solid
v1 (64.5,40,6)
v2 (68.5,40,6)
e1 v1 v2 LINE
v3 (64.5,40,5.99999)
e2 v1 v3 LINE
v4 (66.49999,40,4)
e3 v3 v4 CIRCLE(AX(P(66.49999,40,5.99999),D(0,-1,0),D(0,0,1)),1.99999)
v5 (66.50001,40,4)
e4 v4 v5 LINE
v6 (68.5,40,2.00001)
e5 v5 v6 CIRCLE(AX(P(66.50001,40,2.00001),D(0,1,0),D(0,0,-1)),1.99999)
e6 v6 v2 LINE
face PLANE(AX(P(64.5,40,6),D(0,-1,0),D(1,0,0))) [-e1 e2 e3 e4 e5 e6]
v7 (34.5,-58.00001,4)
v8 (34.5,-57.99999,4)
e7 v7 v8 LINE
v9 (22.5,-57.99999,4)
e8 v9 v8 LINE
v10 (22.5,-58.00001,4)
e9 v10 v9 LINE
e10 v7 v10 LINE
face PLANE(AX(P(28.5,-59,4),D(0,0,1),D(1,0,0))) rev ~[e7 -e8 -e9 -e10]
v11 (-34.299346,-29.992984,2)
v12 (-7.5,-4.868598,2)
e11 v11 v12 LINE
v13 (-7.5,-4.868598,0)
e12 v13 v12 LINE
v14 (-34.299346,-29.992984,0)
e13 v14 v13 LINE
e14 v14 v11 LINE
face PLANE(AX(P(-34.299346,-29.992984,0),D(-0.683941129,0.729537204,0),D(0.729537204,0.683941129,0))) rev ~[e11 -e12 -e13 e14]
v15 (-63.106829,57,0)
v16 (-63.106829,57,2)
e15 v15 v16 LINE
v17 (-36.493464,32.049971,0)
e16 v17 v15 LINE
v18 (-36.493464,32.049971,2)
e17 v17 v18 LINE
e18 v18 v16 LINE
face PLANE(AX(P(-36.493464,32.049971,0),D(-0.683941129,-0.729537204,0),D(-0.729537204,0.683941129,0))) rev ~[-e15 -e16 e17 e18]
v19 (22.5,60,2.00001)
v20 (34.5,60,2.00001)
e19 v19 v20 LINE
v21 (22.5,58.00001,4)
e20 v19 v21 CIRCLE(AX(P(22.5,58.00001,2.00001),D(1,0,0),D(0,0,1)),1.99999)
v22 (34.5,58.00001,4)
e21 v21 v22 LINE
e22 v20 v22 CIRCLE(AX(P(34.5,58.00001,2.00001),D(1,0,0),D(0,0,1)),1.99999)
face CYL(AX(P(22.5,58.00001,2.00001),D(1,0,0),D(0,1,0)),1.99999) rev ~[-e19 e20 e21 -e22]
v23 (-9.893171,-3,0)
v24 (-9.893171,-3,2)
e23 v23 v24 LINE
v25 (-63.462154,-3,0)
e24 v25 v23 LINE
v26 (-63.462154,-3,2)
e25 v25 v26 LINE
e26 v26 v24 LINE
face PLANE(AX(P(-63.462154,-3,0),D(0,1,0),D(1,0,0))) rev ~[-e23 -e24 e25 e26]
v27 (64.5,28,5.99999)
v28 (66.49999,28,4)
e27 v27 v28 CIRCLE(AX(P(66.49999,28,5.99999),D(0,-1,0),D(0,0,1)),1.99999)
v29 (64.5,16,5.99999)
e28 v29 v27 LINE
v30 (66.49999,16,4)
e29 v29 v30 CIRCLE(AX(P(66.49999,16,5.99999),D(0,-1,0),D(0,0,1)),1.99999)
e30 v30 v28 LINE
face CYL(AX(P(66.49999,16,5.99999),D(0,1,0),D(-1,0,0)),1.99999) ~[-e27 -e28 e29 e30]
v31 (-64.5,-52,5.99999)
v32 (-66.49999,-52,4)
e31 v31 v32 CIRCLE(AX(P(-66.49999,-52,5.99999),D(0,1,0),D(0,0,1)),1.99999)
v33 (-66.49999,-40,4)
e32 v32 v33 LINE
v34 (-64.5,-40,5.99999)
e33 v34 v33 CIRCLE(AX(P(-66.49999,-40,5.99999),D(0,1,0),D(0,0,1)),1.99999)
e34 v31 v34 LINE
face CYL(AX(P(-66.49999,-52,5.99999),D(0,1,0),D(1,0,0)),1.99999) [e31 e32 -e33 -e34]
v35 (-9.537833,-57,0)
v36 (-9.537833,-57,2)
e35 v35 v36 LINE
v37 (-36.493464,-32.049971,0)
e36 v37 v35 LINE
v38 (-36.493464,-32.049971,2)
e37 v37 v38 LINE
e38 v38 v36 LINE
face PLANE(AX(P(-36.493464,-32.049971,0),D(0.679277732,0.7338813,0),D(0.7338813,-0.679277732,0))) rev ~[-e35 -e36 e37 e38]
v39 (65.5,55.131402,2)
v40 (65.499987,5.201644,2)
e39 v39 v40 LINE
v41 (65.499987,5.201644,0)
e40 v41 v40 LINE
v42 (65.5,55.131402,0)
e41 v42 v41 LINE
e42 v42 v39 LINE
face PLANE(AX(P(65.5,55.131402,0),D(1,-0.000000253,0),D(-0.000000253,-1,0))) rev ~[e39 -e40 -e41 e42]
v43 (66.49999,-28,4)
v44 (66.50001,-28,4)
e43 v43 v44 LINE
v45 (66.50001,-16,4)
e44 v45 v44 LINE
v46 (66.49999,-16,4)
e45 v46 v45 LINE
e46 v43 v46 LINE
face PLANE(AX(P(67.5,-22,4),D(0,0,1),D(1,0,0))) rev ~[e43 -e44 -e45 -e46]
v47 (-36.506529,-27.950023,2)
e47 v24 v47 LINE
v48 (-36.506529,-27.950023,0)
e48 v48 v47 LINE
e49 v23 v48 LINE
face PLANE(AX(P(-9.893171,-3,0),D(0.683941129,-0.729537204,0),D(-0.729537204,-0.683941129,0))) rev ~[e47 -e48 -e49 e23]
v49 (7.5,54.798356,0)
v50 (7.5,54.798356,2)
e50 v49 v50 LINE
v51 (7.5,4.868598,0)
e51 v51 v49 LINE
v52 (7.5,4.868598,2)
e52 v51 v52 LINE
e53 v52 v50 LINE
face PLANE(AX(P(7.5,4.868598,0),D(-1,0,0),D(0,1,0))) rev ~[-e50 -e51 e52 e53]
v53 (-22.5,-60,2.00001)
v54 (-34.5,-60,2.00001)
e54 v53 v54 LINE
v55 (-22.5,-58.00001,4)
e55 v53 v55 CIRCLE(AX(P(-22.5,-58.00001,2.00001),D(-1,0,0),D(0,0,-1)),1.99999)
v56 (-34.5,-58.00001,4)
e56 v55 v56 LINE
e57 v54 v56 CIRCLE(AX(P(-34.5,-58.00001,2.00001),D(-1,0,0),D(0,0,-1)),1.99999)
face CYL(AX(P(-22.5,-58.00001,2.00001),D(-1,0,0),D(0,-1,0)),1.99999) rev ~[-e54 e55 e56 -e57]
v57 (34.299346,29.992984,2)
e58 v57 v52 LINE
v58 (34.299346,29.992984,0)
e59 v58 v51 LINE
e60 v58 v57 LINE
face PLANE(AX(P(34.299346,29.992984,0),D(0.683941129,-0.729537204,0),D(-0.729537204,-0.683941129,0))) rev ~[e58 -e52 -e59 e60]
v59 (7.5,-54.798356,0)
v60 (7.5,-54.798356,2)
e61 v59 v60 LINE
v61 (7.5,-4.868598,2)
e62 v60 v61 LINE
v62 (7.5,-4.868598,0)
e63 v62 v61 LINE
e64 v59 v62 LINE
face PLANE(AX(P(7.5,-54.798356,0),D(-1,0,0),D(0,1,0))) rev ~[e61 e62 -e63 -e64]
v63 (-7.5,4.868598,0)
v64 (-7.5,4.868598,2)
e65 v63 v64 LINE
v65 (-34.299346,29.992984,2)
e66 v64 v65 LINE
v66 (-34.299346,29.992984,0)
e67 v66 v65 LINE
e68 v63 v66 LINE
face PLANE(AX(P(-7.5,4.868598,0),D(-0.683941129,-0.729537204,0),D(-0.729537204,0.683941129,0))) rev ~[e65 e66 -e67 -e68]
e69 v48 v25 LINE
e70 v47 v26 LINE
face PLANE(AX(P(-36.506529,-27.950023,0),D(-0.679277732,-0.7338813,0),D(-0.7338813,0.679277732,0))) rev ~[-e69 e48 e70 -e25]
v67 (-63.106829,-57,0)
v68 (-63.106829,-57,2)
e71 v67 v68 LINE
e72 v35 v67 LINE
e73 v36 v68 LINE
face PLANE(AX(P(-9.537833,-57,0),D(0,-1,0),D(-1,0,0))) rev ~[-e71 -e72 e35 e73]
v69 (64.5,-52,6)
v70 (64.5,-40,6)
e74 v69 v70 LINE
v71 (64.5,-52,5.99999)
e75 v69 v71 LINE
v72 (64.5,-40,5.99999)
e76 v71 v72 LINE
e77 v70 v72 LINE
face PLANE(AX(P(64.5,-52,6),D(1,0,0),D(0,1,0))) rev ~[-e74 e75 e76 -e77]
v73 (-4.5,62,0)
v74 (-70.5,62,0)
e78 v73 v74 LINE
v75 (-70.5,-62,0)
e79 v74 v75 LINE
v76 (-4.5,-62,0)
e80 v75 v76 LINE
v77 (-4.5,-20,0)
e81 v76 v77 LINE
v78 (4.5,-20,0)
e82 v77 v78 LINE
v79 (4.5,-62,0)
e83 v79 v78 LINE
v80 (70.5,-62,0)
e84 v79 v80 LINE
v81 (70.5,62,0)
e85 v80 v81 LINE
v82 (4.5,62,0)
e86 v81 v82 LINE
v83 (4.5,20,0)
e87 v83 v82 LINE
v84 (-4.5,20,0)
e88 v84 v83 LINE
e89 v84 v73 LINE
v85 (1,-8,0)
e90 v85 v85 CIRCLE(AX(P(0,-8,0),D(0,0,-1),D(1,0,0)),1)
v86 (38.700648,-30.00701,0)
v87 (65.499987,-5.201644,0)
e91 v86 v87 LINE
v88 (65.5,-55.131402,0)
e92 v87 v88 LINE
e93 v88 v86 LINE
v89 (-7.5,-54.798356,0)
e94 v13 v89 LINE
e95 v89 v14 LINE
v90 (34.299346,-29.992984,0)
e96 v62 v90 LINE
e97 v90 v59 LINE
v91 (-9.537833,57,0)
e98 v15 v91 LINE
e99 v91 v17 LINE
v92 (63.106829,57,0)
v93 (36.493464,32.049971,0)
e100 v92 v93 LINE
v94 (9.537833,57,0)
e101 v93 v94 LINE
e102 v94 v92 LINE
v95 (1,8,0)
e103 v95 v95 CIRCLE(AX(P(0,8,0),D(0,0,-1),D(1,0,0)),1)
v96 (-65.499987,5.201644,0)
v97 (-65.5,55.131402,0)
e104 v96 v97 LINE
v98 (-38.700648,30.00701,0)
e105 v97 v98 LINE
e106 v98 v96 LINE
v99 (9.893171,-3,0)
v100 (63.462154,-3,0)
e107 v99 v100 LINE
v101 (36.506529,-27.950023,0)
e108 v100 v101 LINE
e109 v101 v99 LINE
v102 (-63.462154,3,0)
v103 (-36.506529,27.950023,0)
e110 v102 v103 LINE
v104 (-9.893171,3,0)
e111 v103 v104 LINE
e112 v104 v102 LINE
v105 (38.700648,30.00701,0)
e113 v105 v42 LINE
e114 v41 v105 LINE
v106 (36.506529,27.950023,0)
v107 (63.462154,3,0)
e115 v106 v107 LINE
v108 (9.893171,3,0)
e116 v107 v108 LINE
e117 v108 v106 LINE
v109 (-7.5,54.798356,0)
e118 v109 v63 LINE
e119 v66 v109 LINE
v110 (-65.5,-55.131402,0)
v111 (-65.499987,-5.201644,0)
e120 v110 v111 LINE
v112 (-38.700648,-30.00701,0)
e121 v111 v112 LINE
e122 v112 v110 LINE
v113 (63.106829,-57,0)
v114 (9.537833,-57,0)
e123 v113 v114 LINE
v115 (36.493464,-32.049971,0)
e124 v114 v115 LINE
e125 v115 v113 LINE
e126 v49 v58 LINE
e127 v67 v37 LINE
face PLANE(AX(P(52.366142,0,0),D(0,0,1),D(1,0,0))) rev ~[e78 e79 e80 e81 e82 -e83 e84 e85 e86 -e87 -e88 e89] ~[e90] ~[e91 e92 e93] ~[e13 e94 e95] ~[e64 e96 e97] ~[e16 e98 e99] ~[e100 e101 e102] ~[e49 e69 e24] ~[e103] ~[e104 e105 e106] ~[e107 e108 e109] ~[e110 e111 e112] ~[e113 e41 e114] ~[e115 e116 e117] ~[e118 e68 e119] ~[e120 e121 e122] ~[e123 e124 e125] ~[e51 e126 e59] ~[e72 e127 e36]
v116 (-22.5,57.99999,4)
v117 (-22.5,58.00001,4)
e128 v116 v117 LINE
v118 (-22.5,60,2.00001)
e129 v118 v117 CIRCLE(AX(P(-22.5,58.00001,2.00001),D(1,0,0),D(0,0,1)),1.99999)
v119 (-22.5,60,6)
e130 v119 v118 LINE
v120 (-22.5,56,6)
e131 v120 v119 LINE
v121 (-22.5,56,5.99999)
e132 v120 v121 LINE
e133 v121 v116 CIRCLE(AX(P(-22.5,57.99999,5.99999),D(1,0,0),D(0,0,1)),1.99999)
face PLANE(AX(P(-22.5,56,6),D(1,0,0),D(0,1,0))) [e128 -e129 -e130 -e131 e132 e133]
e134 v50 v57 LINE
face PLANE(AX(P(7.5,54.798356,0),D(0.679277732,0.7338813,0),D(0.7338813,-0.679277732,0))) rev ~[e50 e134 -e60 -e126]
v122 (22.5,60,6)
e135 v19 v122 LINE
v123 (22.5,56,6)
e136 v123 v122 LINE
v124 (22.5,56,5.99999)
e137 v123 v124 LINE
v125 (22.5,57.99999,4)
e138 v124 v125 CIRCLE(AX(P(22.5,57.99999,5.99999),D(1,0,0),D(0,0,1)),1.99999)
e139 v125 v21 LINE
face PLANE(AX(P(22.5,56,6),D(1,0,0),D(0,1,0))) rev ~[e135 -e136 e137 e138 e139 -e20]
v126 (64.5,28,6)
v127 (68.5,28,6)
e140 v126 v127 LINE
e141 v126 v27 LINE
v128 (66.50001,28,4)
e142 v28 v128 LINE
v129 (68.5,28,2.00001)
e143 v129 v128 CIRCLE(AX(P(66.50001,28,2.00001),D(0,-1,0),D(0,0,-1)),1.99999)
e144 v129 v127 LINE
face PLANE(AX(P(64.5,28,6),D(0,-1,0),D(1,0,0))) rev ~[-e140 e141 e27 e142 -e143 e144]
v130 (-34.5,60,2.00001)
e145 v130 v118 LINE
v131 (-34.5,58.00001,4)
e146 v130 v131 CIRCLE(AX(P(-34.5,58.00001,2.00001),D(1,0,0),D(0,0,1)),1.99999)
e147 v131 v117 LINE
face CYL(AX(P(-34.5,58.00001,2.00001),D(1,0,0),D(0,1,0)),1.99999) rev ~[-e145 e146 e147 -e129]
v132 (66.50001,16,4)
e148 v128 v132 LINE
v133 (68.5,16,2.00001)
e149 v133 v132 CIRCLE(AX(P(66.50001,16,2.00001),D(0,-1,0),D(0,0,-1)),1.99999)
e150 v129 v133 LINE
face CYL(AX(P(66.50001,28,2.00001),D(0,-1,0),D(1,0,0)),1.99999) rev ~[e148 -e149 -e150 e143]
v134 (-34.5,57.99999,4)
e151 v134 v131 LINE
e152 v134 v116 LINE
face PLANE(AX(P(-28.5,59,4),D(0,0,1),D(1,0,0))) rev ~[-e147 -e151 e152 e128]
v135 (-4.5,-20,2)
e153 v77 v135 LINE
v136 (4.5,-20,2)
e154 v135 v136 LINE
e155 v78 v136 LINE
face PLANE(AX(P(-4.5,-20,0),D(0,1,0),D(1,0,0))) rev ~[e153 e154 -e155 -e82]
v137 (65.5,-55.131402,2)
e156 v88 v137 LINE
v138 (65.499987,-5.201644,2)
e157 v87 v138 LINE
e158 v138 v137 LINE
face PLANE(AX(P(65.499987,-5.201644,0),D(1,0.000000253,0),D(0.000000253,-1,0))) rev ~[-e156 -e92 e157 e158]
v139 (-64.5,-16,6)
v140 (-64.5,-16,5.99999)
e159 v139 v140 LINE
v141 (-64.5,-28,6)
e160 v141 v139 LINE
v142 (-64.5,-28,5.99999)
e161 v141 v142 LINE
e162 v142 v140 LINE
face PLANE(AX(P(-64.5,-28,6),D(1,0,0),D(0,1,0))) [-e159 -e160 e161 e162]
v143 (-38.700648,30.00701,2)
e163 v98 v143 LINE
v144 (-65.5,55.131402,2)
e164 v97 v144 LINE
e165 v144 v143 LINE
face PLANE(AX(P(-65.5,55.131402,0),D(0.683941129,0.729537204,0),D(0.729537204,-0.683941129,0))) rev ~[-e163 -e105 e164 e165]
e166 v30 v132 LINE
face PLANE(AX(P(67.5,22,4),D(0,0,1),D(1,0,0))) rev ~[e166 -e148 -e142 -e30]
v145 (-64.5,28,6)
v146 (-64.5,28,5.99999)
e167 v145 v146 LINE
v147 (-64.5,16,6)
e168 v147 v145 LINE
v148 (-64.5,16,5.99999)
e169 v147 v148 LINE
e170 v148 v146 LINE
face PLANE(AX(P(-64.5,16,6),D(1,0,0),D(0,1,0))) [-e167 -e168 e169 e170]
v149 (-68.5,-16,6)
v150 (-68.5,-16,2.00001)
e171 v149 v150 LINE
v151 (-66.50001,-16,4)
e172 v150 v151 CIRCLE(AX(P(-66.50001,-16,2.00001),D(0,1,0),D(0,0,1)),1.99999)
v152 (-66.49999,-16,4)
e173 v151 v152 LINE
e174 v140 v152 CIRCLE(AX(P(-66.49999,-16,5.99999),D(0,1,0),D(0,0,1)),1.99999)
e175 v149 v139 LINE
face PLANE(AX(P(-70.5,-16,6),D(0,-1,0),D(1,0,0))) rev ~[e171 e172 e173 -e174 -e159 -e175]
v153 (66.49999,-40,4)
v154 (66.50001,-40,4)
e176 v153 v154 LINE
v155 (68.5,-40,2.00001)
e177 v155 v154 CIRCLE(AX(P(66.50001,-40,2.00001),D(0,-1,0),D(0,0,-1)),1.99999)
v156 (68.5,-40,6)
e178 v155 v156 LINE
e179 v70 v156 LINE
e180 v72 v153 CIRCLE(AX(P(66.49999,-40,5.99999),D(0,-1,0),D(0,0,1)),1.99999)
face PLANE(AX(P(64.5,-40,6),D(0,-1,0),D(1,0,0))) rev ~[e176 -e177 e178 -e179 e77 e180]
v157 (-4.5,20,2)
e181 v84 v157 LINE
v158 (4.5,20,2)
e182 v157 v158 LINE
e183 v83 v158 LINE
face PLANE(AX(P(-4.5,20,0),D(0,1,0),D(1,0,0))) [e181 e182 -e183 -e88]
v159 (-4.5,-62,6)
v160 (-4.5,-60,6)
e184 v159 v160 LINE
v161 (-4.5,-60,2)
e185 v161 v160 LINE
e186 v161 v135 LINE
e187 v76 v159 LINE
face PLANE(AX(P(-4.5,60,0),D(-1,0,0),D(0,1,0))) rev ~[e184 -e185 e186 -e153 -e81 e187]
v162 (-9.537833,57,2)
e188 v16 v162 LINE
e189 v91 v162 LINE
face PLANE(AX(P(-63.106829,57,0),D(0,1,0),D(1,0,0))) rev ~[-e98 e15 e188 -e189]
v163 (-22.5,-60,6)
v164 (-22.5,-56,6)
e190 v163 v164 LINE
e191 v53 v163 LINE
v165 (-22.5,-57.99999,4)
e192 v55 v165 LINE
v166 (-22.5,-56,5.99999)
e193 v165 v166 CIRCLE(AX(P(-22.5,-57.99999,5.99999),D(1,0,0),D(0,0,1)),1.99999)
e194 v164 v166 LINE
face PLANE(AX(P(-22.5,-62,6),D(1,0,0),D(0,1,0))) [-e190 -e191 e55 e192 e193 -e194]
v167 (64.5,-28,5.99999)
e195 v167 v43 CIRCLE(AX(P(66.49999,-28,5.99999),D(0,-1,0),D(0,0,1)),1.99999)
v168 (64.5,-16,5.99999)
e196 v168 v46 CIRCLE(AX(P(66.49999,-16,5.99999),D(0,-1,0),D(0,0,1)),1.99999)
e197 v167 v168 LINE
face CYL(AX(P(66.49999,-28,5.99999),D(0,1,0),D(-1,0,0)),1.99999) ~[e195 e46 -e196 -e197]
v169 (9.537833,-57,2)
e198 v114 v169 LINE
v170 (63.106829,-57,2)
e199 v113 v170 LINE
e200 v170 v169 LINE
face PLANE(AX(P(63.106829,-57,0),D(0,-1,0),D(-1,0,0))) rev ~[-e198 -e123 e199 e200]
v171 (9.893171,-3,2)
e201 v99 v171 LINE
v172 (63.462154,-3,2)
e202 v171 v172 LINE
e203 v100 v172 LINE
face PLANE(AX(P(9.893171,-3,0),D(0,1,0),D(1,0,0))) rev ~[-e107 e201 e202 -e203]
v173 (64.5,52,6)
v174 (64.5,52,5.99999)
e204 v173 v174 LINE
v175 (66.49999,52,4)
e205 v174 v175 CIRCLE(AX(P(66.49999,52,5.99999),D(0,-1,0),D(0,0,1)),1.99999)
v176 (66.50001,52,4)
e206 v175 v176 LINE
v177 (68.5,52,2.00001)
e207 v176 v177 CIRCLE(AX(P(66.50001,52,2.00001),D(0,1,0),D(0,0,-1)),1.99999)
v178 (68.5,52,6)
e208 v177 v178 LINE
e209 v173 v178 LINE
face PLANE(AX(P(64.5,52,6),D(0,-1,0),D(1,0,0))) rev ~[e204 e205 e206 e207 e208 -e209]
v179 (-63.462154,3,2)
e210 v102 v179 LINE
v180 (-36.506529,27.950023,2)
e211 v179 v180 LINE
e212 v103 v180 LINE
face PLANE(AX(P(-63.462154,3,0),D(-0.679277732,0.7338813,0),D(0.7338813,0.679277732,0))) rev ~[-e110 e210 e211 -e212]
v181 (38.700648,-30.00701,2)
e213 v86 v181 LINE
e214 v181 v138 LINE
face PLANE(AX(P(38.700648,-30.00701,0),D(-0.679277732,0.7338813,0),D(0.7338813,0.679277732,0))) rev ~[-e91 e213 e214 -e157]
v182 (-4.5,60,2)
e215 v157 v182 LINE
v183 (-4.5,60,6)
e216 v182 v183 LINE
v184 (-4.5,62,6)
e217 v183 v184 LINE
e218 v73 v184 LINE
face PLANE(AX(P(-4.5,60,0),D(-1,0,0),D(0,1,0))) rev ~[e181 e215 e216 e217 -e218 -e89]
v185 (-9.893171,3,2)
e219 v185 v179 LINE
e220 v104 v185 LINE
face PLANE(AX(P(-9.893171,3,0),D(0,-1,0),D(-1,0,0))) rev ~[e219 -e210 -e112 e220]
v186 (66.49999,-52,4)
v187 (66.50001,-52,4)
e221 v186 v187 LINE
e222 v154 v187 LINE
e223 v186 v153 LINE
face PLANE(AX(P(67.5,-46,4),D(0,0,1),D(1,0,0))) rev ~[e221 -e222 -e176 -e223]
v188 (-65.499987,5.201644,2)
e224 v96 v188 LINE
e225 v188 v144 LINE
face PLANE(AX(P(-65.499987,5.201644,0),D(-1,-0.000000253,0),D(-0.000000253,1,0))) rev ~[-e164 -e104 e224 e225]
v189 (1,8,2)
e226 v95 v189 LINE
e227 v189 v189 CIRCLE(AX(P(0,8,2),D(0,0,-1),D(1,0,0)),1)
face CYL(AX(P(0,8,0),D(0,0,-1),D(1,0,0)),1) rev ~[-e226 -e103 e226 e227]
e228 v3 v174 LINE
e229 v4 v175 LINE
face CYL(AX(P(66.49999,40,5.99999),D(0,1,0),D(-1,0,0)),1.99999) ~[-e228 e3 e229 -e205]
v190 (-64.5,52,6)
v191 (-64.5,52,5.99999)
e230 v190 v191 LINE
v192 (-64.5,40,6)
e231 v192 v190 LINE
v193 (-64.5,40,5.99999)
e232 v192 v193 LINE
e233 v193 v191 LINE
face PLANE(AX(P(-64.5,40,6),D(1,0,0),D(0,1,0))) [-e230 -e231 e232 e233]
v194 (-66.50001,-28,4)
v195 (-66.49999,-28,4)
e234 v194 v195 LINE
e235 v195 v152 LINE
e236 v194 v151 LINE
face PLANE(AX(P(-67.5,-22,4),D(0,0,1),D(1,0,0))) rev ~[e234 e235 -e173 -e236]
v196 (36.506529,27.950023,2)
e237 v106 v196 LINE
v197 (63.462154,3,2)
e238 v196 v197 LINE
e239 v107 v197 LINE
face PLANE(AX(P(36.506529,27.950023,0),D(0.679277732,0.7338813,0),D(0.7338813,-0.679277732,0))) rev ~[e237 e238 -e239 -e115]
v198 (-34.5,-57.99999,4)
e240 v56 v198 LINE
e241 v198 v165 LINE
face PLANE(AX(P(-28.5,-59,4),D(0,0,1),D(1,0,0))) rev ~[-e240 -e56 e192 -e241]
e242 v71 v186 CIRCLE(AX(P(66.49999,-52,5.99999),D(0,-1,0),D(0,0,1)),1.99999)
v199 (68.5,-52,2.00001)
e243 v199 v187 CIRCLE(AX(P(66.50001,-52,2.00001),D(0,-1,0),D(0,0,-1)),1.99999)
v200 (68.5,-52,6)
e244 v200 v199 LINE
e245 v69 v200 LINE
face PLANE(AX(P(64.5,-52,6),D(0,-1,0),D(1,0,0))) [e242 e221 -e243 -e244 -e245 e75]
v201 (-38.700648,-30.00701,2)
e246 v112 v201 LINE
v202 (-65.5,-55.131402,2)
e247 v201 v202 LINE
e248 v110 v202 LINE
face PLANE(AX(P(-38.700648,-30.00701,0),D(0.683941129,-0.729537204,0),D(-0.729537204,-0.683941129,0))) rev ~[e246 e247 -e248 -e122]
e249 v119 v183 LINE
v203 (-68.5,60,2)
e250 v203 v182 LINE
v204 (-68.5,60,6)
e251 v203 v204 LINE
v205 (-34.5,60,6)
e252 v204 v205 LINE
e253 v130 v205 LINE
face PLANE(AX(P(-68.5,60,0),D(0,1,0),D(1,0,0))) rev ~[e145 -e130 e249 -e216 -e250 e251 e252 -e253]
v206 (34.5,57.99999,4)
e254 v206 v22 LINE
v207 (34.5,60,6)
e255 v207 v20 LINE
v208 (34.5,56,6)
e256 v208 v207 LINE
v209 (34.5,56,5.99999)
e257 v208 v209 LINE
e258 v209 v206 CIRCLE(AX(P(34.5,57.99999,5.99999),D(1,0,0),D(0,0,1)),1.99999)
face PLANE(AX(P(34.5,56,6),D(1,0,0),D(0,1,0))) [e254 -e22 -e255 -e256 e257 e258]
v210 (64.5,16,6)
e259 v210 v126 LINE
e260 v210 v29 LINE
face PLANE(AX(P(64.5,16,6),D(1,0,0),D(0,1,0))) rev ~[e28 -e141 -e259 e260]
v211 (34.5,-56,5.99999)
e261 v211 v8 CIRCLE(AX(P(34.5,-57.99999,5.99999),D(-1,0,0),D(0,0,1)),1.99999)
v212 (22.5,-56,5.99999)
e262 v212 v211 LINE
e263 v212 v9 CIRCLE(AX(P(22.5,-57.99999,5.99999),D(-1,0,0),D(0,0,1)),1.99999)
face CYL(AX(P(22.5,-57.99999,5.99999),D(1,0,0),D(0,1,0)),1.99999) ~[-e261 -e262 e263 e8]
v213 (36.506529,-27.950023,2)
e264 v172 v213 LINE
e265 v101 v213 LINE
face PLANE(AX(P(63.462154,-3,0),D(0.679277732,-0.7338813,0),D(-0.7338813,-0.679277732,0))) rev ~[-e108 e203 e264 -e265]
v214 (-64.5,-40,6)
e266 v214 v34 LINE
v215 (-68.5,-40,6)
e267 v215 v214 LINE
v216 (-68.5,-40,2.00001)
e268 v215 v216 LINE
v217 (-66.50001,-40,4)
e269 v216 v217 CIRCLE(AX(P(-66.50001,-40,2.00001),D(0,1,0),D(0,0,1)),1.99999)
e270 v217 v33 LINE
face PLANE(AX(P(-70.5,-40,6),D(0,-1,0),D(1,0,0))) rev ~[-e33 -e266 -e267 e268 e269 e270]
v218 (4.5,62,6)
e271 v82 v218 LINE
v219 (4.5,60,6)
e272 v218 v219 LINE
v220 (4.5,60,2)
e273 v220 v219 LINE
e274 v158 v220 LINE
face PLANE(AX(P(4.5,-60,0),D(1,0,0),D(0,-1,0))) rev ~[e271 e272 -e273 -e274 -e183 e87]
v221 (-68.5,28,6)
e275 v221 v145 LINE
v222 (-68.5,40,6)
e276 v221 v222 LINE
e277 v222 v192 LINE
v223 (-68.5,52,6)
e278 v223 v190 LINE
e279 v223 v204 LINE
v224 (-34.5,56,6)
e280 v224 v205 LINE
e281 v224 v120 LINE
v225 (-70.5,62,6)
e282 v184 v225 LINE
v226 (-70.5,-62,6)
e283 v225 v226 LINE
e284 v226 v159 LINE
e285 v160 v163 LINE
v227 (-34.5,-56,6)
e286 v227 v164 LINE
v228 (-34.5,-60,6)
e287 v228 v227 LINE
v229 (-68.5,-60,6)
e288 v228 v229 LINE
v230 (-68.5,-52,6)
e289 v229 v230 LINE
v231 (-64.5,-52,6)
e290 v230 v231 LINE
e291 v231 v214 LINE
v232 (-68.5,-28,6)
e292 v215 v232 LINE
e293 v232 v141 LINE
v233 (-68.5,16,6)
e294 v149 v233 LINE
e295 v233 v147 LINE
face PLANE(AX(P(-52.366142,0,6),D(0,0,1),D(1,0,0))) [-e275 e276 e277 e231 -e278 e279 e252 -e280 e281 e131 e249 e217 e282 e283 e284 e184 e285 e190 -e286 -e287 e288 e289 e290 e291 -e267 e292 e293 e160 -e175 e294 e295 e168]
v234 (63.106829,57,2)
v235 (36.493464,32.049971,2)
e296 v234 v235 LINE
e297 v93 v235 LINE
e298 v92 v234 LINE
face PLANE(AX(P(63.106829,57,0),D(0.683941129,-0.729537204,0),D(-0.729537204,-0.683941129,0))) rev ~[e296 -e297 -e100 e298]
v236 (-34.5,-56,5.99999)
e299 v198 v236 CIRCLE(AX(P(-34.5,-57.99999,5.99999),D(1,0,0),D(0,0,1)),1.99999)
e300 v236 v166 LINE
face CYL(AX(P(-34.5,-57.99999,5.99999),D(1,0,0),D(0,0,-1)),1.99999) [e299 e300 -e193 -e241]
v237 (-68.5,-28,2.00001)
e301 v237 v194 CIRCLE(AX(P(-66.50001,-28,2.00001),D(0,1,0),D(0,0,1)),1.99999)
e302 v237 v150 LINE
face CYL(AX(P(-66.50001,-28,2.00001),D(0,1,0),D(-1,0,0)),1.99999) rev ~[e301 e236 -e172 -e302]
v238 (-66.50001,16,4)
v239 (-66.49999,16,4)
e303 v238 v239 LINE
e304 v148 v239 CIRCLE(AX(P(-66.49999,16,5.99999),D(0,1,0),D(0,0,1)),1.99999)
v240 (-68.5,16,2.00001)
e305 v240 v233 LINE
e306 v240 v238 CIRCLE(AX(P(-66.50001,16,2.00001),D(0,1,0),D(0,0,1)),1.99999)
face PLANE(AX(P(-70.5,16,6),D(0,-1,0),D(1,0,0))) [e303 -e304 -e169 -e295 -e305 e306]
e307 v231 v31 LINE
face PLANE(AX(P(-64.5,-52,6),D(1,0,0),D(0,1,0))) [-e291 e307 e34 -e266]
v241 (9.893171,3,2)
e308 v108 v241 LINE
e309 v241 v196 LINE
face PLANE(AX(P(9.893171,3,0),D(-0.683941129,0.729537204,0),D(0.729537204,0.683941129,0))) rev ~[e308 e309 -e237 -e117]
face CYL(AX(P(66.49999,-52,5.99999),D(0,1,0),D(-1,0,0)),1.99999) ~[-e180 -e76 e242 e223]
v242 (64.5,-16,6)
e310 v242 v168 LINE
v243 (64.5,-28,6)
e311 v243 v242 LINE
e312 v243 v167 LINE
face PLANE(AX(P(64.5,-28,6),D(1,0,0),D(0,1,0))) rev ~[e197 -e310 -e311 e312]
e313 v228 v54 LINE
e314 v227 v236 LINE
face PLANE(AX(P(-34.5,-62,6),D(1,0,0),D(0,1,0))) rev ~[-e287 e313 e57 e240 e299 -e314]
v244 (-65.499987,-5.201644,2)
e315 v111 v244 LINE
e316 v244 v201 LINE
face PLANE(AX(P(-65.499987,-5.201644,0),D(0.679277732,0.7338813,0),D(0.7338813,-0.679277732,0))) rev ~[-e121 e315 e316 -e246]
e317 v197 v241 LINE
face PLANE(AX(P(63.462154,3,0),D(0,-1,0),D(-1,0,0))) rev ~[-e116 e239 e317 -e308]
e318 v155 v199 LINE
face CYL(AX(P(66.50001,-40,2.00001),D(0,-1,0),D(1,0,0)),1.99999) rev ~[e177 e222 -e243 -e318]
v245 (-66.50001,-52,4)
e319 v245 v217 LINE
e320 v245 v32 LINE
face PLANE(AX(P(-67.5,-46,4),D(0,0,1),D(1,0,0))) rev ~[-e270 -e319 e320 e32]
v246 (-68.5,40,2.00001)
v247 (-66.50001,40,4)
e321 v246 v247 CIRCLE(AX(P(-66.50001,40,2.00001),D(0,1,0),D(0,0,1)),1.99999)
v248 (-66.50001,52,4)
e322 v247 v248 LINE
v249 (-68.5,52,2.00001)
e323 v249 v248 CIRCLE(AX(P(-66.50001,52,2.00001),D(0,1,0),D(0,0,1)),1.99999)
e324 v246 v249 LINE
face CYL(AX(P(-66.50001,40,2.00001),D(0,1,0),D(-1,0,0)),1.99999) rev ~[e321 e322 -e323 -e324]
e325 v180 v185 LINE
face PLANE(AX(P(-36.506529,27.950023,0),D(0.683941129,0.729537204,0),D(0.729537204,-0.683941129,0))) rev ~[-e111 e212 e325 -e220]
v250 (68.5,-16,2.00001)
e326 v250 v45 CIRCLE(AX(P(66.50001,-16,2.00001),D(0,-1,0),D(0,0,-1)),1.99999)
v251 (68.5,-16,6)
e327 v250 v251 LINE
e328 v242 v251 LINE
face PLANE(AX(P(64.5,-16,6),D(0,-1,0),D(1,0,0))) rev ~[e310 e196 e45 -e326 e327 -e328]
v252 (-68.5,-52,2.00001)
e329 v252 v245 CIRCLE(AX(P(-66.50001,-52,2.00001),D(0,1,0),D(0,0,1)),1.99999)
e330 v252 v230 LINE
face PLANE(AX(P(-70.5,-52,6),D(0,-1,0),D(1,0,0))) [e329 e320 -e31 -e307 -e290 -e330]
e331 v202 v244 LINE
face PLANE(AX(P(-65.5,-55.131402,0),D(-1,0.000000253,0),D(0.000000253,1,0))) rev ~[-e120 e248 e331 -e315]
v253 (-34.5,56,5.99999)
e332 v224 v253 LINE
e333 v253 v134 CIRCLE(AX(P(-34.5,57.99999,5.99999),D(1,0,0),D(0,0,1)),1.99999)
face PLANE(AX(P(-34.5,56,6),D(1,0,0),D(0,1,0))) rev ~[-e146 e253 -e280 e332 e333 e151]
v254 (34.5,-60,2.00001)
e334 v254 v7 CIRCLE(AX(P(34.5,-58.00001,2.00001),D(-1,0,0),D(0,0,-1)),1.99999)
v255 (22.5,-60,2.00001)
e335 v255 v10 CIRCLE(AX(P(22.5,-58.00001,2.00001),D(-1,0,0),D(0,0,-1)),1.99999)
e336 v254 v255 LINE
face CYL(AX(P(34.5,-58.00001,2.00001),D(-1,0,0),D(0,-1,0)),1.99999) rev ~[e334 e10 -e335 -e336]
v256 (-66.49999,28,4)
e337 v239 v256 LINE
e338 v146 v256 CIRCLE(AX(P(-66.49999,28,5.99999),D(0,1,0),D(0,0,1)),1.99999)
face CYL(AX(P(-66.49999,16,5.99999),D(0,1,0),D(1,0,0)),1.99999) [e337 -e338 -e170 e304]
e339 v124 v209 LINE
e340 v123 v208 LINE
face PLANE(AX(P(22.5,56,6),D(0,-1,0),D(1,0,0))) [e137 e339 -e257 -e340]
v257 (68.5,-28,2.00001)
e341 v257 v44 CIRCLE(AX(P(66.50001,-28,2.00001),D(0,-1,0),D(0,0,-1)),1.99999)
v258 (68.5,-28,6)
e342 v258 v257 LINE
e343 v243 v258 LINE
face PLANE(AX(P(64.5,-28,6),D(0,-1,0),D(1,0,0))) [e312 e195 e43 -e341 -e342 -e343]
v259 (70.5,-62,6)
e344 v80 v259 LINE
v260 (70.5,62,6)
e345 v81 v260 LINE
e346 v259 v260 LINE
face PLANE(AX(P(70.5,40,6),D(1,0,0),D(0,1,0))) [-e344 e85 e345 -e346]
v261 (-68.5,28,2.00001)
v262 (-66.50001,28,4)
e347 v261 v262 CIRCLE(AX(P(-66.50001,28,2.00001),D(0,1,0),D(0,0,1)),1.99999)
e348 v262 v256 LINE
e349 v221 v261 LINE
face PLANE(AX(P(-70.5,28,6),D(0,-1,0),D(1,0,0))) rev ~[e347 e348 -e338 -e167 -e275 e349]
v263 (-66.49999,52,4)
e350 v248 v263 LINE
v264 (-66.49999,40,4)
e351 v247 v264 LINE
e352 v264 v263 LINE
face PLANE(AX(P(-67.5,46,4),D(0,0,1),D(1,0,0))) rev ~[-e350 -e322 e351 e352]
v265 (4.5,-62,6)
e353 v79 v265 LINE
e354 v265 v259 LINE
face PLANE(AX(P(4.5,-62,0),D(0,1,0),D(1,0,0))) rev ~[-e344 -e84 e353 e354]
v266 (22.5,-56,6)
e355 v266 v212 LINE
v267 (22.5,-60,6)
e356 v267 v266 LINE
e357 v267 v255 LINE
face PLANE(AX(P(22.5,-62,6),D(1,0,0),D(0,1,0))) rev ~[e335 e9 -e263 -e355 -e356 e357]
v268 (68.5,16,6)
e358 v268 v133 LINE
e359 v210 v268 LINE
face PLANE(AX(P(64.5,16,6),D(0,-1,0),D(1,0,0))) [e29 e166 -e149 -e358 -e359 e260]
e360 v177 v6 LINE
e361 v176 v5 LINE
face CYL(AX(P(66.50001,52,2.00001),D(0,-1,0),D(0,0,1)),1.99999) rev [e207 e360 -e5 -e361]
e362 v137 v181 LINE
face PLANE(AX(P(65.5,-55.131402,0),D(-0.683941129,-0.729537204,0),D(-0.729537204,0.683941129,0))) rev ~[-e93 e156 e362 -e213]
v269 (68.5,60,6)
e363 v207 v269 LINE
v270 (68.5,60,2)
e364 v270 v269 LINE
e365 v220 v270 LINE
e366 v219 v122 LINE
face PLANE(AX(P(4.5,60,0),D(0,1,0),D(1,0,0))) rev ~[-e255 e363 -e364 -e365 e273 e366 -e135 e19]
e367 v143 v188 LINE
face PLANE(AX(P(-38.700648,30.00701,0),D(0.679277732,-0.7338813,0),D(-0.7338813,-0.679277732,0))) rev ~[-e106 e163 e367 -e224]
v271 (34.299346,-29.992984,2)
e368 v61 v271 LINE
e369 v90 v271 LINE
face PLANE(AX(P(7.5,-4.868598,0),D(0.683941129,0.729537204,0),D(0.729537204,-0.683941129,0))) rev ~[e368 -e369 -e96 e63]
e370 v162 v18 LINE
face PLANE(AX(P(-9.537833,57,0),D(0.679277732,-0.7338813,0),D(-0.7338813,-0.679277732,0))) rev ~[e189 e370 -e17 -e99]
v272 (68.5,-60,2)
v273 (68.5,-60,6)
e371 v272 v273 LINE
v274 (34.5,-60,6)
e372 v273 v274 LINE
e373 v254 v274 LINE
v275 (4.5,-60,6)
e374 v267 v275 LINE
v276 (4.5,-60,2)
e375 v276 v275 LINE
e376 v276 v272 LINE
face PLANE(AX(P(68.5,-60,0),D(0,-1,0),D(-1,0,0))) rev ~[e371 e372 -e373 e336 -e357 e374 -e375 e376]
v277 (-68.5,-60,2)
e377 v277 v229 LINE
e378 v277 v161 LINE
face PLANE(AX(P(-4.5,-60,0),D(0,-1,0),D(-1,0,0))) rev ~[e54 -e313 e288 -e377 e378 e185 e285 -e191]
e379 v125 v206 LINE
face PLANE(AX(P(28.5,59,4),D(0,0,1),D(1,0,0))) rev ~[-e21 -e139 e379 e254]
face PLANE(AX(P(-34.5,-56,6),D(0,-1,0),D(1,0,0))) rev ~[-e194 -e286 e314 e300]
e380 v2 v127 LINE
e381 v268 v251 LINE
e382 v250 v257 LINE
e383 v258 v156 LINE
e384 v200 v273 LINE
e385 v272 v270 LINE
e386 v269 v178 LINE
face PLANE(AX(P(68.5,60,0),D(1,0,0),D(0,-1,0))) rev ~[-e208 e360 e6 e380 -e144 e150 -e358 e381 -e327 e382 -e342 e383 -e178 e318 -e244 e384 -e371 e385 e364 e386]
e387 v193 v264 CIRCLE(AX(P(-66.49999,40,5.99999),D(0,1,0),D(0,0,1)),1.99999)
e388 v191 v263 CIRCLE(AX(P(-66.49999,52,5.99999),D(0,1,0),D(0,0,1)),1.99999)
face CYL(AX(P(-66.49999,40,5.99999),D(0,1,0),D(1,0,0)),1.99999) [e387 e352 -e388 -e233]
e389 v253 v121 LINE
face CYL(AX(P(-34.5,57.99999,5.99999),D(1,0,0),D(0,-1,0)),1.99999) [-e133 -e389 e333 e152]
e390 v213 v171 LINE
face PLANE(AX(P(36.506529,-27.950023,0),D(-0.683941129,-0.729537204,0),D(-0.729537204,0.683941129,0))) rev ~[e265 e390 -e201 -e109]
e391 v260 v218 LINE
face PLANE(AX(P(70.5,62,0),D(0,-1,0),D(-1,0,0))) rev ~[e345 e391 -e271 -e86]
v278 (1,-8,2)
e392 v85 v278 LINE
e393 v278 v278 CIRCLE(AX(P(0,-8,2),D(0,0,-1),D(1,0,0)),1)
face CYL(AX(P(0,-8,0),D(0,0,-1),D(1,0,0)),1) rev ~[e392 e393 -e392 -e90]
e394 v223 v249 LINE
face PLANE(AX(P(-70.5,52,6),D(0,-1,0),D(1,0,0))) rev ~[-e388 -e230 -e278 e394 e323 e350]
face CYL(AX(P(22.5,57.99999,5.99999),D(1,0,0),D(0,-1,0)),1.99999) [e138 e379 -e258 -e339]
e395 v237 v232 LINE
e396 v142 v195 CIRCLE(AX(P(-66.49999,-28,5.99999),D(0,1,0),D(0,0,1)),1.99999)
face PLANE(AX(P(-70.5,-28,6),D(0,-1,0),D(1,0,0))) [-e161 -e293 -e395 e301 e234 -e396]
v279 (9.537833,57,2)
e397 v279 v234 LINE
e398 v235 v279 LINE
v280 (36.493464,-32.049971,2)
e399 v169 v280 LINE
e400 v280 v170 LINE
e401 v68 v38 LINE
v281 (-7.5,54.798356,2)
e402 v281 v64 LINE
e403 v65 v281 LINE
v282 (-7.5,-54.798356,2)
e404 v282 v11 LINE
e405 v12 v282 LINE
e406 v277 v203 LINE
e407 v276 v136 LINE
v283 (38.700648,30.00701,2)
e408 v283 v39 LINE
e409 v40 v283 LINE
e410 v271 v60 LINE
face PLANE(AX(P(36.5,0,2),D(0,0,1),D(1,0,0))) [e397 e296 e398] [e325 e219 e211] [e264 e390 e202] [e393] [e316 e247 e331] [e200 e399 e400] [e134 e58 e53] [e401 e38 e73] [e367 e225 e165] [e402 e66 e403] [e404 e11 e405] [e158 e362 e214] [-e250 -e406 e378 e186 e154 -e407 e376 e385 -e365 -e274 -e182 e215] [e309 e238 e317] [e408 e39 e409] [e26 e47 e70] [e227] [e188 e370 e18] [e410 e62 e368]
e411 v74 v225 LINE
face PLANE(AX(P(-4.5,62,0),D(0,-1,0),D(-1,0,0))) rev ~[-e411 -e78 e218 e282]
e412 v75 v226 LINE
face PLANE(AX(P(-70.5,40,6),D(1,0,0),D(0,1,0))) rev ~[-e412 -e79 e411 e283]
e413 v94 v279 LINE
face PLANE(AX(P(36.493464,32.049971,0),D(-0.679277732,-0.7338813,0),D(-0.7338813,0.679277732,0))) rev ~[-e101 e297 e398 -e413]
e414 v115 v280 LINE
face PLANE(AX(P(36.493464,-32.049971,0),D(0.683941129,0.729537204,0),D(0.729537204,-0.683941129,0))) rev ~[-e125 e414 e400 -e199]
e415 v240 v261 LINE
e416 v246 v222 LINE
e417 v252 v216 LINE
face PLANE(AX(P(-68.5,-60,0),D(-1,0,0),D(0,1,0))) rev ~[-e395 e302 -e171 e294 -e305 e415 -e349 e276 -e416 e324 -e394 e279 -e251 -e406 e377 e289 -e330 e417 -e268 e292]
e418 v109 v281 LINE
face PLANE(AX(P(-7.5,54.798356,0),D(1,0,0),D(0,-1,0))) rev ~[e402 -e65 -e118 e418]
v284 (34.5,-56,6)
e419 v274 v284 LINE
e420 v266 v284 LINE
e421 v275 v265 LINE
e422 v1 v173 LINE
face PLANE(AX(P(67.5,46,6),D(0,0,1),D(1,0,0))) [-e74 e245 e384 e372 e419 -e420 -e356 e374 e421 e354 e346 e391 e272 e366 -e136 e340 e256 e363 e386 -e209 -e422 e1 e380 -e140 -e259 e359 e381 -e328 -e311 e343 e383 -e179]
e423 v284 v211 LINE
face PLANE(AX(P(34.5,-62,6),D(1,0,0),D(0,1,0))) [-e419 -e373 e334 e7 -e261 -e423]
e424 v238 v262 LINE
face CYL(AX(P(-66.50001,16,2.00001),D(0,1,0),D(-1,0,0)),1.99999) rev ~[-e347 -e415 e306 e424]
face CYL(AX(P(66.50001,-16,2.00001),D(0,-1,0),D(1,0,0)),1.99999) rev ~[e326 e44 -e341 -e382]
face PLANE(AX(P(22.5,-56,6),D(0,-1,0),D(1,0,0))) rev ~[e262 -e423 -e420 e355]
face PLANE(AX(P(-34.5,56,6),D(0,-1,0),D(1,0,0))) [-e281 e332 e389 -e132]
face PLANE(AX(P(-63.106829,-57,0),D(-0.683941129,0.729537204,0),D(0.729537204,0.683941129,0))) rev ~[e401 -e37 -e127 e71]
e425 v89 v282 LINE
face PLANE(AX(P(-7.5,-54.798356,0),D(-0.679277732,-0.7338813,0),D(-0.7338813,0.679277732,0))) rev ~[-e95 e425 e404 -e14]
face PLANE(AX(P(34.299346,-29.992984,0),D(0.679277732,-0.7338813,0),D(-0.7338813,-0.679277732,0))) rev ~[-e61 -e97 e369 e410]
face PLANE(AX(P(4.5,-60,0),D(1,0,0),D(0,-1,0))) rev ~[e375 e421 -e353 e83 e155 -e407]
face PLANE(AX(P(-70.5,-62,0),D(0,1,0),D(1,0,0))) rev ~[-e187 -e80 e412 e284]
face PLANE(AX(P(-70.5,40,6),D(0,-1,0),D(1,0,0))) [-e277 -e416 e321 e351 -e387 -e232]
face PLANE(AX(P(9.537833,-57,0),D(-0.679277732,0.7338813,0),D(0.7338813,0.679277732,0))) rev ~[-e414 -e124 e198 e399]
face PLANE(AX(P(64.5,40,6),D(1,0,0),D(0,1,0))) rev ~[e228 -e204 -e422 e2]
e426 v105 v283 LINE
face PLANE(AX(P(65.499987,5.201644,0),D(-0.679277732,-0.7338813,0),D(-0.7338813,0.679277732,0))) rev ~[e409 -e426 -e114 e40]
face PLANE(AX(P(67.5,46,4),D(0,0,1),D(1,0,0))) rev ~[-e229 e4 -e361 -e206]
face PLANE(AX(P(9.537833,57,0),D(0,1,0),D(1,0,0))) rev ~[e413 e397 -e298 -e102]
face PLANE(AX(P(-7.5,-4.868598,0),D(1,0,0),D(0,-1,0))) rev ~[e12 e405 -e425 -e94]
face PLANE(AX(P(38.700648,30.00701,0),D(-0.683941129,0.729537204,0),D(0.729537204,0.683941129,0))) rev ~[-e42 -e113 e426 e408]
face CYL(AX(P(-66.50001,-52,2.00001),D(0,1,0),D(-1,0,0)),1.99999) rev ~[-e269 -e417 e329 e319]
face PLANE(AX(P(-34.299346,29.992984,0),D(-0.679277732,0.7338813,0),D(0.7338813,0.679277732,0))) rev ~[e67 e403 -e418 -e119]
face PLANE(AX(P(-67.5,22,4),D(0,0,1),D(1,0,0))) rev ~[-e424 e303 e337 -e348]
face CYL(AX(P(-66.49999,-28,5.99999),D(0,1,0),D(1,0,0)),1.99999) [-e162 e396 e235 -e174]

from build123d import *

# Parameters (mm, degrees)
F0_W     = 64
F0_H     = 120
F2_DEPTH = 2
F3_DEPTH = 6
F4_W     = 6
F4_H     = 12
F4_W_2   = 12
F4_H_2   = 6
F5_DEPTH = 2
F7_DEPTH = 2
F8_W     = 9
F8_H     = 40
F8_R     = 1
F9_DEPTH = 2
F10_R    = 1.99999
F11_R    = 1.99999


# Not quite as in the source:
# - a fillet or chamfer is up to 0.001 mm smaller than in the source, because OpenCascade refuses the exact size


with BuildPart() as f2:
    # F0 (on Top) → F2 (new body)
    with BuildSketch(Plane.XY):
        with Locations((-36.5, 0)):
            Rectangle(F0_W, F0_H)
    extrude(amount=F2_DEPTH)

    # F1 (on Top) → F3 (join)
    with BuildSketch(Plane.XY):
        Polygon((-4.5, 60), (-4.5, 62), (-70.5, 62), (-70.5, -62), (-4.5, -62), (-4.5, -60), (-68.5, -60), (-68.5, 60), align=None)
    extrude(amount=F3_DEPTH)

    # F4 (on face) → F5 (join)
    with BuildSketch(Plane.XY.offset(6)):
        with Locations((-67.5, 46)):
            Rectangle(F4_W, F4_H)
        with Locations((-28.5, 59)):
            Rectangle(F4_W_2, F4_H_2)
        with Locations((-67.5, 22)):
            Rectangle(F4_W, F4_H)
        with Locations((-28.5, -59)):
            Rectangle(F4_W_2, F4_H_2)
        with Locations((-67.5, -22)):
            Rectangle(F4_W, F4_H)
        with Locations((-67.5, -46)):
            Rectangle(F4_W, F4_H)
    extrude(amount=-F5_DEPTH)


with BuildPart() as f2b:
    # F0 (on Top) → F2, piece 2 (new body)
    with BuildSketch(Plane.XY):
        with Locations((36.5, 0)):
            Rectangle(F0_W, F0_H)
    extrude(amount=F2_DEPTH)

    # F1 (on Top) → F3, piece 2 (join)
    with BuildSketch(Plane.XY):
        Polygon((70.5, -62), (70.5, 62), (4.5, 62), (4.5, 60), (68.5, 60), (68.5, -60), (4.5, -60), (4.5, -62), align=None)
    extrude(amount=F3_DEPTH)

    # F4 (on face) → F5, piece 2 (join)
    with BuildSketch(Plane.XY.offset(6)):
        with Locations((67.5, 46)):
            Rectangle(F4_W, F4_H)
        with Locations((67.5, -22)):
            Rectangle(F4_W, F4_H)
        with Locations((67.5, -46)):
            Rectangle(F4_W, F4_H)
        with Locations((28.5, 59)):
            Rectangle(F4_W_2, F4_H_2)
        with Locations((67.5, 22)):
            Rectangle(F4_W, F4_H)
        with Locations((28.5, -59)):
            Rectangle(F4_W_2, F4_H_2)
    extrude(amount=-F5_DEPTH)


with BuildPart() as f7_tool:
    # F6 (on face) → F7 (new body)
    with BuildSketch(Plane(origin=(0, 0, 0), x_dir=(1, 0, 0), z_dir=(0, 0, -1))):
        Polygon((-9.5378331968, 57.0000003456), (-63.1068291486, 57.0000003456), (-36.4934644097, 32.0499709028), align=None)
        Polygon((-7.5, 4.8685980187), (-7.5, 54.7983564456), (-34.2993455202, 29.9929844439), align=None)
        Polygon((-9.8931712199, 3), (-36.5065294908, 27.9500233789), (-63.4621541524, 3), align=None)
        Polygon((-65.4999873492, 5.2016438999), (-38.7006483802, 30.0070098378), (-65.5, 55.1314019813), align=None)
        Polygon((-63.4621541524, -3), (-36.5065294908, -27.9500233789), (-9.8931712199, -3), align=None)
        Polygon((-7.5, -4.8685980187), (-34.2993455202, -29.9929844439), (-7.5, -54.7983564456), align=None)
        Polygon((-9.5378331968, -57.0000003456), (-36.4934644097, -32.0499709028), (-63.1068291486, -57.0000003456), align=None)
        Polygon((-65.5, -55.1314019813), (-38.7006483802, -30.0070098378), (-65.4999873492, -5.2016438999), align=None)
        Polygon((7.5, -54.7983564456), (34.2993455202, -29.9929844439), (7.5, -4.8685980187), align=None)
        Polygon((63.1068291486, -57.0000003456), (36.4934644097, -32.0499709028), (9.5378331968, -57.0000003456), align=None)
        Polygon((65.5, -55.1314019813), (65.4999873492, -5.2016438999), (38.7006483802, -30.0070098378), align=None)
        Polygon((36.5065294908, -27.9500233789), (63.4621541524, -3), (9.8931712199, -3), align=None)
        Polygon((63.4621541524, 3), (36.5065294908, 27.9500233789), (9.8931712199, 3), align=None)
        Polygon((7.5, 4.8685980187), (34.2993455202, 29.9929844439), (7.5, 54.7983564456), align=None)
        Polygon((9.5378331968, 57.0000003456), (36.4934644097, 32.0499709028), (63.1068291486, 57.0000003456), align=None)
        Polygon((65.5, 55.1314019813), (38.7006483802, 30.0070098378), (65.4999873492, 5.2016438999), align=None)
    extrude(amount=-F7_DEPTH)


with BuildPart() as f2_1:
    add(f2.part)

    # F7: cut by f7_tool
    add(f7_tool.part, mode=Mode.SUBTRACT)



with BuildPart() as f2b_1:
    add(f2b.part)

    # F7: cut by f7_tool
    add(f7_tool.part, mode=Mode.SUBTRACT)


with BuildPart() as f2_2:
    add(f2_1.part)

    add(f2b_1.part)  # F9 merges F2b
    # F8 (on face) → F9 (join)
    with BuildSketch(Plane(origin=(0, 0, 0), x_dir=(1, 0, 0), z_dir=(0, 0, -1))):
        Rectangle(F8_W, F8_H)
        with Locations((0, -8)):
            Circle(F8_R, mode=Mode.SUBTRACT)
        with Locations((0, 8)):
            Circle(F8_R, mode=Mode.SUBTRACT)
    extrude(amount=-F9_DEPTH)

    # F10 (radius 2 in the source; OpenCascade refuses exactly that, so slightly less here)
    f10_edges = [f2_2.edges().sort_by_distance(p)[0] for p in [
        (28.5, -56, 4),
        (-28.5, -56, 4),
        (64.5, -46, 4),
        (64.5, -22, 4),
        (-64.5, -46, 4),
        (-64.5, -22, 4),
        (64.5, 22, 4),
        (64.5, 46, 4),
        (-28.5, 56, 4),
        (28.5, 56, 4),
        (-64.5, 22, 4),
        (-64.5, 46, 4),
    ]]
    fillet(f10_edges, radius=F10_R)

    # F11 (radius 2 in the source; OpenCascade refuses exactly that, so slightly less here)
    f11_edges = [f2_2.edges().sort_by_distance(p)[0] for p in [
        (28.5, -60, 4),
        (-28.5, -60, 4),
        (-68.5, -46, 4),
        (-68.5, -22, 4),
        (68.5, -46, 4),
        (68.5, -22, 4),
        (68.5, 46, 4),
        (68.5, 22, 4),
        (28.5, 60, 4),
        (-28.5, 60, 4),
        (-68.5, 22, 4),
        (-68.5, 46, 4),
    ]]
    fillet(f11_edges, radius=F11_R)


solid = f2_2.part
